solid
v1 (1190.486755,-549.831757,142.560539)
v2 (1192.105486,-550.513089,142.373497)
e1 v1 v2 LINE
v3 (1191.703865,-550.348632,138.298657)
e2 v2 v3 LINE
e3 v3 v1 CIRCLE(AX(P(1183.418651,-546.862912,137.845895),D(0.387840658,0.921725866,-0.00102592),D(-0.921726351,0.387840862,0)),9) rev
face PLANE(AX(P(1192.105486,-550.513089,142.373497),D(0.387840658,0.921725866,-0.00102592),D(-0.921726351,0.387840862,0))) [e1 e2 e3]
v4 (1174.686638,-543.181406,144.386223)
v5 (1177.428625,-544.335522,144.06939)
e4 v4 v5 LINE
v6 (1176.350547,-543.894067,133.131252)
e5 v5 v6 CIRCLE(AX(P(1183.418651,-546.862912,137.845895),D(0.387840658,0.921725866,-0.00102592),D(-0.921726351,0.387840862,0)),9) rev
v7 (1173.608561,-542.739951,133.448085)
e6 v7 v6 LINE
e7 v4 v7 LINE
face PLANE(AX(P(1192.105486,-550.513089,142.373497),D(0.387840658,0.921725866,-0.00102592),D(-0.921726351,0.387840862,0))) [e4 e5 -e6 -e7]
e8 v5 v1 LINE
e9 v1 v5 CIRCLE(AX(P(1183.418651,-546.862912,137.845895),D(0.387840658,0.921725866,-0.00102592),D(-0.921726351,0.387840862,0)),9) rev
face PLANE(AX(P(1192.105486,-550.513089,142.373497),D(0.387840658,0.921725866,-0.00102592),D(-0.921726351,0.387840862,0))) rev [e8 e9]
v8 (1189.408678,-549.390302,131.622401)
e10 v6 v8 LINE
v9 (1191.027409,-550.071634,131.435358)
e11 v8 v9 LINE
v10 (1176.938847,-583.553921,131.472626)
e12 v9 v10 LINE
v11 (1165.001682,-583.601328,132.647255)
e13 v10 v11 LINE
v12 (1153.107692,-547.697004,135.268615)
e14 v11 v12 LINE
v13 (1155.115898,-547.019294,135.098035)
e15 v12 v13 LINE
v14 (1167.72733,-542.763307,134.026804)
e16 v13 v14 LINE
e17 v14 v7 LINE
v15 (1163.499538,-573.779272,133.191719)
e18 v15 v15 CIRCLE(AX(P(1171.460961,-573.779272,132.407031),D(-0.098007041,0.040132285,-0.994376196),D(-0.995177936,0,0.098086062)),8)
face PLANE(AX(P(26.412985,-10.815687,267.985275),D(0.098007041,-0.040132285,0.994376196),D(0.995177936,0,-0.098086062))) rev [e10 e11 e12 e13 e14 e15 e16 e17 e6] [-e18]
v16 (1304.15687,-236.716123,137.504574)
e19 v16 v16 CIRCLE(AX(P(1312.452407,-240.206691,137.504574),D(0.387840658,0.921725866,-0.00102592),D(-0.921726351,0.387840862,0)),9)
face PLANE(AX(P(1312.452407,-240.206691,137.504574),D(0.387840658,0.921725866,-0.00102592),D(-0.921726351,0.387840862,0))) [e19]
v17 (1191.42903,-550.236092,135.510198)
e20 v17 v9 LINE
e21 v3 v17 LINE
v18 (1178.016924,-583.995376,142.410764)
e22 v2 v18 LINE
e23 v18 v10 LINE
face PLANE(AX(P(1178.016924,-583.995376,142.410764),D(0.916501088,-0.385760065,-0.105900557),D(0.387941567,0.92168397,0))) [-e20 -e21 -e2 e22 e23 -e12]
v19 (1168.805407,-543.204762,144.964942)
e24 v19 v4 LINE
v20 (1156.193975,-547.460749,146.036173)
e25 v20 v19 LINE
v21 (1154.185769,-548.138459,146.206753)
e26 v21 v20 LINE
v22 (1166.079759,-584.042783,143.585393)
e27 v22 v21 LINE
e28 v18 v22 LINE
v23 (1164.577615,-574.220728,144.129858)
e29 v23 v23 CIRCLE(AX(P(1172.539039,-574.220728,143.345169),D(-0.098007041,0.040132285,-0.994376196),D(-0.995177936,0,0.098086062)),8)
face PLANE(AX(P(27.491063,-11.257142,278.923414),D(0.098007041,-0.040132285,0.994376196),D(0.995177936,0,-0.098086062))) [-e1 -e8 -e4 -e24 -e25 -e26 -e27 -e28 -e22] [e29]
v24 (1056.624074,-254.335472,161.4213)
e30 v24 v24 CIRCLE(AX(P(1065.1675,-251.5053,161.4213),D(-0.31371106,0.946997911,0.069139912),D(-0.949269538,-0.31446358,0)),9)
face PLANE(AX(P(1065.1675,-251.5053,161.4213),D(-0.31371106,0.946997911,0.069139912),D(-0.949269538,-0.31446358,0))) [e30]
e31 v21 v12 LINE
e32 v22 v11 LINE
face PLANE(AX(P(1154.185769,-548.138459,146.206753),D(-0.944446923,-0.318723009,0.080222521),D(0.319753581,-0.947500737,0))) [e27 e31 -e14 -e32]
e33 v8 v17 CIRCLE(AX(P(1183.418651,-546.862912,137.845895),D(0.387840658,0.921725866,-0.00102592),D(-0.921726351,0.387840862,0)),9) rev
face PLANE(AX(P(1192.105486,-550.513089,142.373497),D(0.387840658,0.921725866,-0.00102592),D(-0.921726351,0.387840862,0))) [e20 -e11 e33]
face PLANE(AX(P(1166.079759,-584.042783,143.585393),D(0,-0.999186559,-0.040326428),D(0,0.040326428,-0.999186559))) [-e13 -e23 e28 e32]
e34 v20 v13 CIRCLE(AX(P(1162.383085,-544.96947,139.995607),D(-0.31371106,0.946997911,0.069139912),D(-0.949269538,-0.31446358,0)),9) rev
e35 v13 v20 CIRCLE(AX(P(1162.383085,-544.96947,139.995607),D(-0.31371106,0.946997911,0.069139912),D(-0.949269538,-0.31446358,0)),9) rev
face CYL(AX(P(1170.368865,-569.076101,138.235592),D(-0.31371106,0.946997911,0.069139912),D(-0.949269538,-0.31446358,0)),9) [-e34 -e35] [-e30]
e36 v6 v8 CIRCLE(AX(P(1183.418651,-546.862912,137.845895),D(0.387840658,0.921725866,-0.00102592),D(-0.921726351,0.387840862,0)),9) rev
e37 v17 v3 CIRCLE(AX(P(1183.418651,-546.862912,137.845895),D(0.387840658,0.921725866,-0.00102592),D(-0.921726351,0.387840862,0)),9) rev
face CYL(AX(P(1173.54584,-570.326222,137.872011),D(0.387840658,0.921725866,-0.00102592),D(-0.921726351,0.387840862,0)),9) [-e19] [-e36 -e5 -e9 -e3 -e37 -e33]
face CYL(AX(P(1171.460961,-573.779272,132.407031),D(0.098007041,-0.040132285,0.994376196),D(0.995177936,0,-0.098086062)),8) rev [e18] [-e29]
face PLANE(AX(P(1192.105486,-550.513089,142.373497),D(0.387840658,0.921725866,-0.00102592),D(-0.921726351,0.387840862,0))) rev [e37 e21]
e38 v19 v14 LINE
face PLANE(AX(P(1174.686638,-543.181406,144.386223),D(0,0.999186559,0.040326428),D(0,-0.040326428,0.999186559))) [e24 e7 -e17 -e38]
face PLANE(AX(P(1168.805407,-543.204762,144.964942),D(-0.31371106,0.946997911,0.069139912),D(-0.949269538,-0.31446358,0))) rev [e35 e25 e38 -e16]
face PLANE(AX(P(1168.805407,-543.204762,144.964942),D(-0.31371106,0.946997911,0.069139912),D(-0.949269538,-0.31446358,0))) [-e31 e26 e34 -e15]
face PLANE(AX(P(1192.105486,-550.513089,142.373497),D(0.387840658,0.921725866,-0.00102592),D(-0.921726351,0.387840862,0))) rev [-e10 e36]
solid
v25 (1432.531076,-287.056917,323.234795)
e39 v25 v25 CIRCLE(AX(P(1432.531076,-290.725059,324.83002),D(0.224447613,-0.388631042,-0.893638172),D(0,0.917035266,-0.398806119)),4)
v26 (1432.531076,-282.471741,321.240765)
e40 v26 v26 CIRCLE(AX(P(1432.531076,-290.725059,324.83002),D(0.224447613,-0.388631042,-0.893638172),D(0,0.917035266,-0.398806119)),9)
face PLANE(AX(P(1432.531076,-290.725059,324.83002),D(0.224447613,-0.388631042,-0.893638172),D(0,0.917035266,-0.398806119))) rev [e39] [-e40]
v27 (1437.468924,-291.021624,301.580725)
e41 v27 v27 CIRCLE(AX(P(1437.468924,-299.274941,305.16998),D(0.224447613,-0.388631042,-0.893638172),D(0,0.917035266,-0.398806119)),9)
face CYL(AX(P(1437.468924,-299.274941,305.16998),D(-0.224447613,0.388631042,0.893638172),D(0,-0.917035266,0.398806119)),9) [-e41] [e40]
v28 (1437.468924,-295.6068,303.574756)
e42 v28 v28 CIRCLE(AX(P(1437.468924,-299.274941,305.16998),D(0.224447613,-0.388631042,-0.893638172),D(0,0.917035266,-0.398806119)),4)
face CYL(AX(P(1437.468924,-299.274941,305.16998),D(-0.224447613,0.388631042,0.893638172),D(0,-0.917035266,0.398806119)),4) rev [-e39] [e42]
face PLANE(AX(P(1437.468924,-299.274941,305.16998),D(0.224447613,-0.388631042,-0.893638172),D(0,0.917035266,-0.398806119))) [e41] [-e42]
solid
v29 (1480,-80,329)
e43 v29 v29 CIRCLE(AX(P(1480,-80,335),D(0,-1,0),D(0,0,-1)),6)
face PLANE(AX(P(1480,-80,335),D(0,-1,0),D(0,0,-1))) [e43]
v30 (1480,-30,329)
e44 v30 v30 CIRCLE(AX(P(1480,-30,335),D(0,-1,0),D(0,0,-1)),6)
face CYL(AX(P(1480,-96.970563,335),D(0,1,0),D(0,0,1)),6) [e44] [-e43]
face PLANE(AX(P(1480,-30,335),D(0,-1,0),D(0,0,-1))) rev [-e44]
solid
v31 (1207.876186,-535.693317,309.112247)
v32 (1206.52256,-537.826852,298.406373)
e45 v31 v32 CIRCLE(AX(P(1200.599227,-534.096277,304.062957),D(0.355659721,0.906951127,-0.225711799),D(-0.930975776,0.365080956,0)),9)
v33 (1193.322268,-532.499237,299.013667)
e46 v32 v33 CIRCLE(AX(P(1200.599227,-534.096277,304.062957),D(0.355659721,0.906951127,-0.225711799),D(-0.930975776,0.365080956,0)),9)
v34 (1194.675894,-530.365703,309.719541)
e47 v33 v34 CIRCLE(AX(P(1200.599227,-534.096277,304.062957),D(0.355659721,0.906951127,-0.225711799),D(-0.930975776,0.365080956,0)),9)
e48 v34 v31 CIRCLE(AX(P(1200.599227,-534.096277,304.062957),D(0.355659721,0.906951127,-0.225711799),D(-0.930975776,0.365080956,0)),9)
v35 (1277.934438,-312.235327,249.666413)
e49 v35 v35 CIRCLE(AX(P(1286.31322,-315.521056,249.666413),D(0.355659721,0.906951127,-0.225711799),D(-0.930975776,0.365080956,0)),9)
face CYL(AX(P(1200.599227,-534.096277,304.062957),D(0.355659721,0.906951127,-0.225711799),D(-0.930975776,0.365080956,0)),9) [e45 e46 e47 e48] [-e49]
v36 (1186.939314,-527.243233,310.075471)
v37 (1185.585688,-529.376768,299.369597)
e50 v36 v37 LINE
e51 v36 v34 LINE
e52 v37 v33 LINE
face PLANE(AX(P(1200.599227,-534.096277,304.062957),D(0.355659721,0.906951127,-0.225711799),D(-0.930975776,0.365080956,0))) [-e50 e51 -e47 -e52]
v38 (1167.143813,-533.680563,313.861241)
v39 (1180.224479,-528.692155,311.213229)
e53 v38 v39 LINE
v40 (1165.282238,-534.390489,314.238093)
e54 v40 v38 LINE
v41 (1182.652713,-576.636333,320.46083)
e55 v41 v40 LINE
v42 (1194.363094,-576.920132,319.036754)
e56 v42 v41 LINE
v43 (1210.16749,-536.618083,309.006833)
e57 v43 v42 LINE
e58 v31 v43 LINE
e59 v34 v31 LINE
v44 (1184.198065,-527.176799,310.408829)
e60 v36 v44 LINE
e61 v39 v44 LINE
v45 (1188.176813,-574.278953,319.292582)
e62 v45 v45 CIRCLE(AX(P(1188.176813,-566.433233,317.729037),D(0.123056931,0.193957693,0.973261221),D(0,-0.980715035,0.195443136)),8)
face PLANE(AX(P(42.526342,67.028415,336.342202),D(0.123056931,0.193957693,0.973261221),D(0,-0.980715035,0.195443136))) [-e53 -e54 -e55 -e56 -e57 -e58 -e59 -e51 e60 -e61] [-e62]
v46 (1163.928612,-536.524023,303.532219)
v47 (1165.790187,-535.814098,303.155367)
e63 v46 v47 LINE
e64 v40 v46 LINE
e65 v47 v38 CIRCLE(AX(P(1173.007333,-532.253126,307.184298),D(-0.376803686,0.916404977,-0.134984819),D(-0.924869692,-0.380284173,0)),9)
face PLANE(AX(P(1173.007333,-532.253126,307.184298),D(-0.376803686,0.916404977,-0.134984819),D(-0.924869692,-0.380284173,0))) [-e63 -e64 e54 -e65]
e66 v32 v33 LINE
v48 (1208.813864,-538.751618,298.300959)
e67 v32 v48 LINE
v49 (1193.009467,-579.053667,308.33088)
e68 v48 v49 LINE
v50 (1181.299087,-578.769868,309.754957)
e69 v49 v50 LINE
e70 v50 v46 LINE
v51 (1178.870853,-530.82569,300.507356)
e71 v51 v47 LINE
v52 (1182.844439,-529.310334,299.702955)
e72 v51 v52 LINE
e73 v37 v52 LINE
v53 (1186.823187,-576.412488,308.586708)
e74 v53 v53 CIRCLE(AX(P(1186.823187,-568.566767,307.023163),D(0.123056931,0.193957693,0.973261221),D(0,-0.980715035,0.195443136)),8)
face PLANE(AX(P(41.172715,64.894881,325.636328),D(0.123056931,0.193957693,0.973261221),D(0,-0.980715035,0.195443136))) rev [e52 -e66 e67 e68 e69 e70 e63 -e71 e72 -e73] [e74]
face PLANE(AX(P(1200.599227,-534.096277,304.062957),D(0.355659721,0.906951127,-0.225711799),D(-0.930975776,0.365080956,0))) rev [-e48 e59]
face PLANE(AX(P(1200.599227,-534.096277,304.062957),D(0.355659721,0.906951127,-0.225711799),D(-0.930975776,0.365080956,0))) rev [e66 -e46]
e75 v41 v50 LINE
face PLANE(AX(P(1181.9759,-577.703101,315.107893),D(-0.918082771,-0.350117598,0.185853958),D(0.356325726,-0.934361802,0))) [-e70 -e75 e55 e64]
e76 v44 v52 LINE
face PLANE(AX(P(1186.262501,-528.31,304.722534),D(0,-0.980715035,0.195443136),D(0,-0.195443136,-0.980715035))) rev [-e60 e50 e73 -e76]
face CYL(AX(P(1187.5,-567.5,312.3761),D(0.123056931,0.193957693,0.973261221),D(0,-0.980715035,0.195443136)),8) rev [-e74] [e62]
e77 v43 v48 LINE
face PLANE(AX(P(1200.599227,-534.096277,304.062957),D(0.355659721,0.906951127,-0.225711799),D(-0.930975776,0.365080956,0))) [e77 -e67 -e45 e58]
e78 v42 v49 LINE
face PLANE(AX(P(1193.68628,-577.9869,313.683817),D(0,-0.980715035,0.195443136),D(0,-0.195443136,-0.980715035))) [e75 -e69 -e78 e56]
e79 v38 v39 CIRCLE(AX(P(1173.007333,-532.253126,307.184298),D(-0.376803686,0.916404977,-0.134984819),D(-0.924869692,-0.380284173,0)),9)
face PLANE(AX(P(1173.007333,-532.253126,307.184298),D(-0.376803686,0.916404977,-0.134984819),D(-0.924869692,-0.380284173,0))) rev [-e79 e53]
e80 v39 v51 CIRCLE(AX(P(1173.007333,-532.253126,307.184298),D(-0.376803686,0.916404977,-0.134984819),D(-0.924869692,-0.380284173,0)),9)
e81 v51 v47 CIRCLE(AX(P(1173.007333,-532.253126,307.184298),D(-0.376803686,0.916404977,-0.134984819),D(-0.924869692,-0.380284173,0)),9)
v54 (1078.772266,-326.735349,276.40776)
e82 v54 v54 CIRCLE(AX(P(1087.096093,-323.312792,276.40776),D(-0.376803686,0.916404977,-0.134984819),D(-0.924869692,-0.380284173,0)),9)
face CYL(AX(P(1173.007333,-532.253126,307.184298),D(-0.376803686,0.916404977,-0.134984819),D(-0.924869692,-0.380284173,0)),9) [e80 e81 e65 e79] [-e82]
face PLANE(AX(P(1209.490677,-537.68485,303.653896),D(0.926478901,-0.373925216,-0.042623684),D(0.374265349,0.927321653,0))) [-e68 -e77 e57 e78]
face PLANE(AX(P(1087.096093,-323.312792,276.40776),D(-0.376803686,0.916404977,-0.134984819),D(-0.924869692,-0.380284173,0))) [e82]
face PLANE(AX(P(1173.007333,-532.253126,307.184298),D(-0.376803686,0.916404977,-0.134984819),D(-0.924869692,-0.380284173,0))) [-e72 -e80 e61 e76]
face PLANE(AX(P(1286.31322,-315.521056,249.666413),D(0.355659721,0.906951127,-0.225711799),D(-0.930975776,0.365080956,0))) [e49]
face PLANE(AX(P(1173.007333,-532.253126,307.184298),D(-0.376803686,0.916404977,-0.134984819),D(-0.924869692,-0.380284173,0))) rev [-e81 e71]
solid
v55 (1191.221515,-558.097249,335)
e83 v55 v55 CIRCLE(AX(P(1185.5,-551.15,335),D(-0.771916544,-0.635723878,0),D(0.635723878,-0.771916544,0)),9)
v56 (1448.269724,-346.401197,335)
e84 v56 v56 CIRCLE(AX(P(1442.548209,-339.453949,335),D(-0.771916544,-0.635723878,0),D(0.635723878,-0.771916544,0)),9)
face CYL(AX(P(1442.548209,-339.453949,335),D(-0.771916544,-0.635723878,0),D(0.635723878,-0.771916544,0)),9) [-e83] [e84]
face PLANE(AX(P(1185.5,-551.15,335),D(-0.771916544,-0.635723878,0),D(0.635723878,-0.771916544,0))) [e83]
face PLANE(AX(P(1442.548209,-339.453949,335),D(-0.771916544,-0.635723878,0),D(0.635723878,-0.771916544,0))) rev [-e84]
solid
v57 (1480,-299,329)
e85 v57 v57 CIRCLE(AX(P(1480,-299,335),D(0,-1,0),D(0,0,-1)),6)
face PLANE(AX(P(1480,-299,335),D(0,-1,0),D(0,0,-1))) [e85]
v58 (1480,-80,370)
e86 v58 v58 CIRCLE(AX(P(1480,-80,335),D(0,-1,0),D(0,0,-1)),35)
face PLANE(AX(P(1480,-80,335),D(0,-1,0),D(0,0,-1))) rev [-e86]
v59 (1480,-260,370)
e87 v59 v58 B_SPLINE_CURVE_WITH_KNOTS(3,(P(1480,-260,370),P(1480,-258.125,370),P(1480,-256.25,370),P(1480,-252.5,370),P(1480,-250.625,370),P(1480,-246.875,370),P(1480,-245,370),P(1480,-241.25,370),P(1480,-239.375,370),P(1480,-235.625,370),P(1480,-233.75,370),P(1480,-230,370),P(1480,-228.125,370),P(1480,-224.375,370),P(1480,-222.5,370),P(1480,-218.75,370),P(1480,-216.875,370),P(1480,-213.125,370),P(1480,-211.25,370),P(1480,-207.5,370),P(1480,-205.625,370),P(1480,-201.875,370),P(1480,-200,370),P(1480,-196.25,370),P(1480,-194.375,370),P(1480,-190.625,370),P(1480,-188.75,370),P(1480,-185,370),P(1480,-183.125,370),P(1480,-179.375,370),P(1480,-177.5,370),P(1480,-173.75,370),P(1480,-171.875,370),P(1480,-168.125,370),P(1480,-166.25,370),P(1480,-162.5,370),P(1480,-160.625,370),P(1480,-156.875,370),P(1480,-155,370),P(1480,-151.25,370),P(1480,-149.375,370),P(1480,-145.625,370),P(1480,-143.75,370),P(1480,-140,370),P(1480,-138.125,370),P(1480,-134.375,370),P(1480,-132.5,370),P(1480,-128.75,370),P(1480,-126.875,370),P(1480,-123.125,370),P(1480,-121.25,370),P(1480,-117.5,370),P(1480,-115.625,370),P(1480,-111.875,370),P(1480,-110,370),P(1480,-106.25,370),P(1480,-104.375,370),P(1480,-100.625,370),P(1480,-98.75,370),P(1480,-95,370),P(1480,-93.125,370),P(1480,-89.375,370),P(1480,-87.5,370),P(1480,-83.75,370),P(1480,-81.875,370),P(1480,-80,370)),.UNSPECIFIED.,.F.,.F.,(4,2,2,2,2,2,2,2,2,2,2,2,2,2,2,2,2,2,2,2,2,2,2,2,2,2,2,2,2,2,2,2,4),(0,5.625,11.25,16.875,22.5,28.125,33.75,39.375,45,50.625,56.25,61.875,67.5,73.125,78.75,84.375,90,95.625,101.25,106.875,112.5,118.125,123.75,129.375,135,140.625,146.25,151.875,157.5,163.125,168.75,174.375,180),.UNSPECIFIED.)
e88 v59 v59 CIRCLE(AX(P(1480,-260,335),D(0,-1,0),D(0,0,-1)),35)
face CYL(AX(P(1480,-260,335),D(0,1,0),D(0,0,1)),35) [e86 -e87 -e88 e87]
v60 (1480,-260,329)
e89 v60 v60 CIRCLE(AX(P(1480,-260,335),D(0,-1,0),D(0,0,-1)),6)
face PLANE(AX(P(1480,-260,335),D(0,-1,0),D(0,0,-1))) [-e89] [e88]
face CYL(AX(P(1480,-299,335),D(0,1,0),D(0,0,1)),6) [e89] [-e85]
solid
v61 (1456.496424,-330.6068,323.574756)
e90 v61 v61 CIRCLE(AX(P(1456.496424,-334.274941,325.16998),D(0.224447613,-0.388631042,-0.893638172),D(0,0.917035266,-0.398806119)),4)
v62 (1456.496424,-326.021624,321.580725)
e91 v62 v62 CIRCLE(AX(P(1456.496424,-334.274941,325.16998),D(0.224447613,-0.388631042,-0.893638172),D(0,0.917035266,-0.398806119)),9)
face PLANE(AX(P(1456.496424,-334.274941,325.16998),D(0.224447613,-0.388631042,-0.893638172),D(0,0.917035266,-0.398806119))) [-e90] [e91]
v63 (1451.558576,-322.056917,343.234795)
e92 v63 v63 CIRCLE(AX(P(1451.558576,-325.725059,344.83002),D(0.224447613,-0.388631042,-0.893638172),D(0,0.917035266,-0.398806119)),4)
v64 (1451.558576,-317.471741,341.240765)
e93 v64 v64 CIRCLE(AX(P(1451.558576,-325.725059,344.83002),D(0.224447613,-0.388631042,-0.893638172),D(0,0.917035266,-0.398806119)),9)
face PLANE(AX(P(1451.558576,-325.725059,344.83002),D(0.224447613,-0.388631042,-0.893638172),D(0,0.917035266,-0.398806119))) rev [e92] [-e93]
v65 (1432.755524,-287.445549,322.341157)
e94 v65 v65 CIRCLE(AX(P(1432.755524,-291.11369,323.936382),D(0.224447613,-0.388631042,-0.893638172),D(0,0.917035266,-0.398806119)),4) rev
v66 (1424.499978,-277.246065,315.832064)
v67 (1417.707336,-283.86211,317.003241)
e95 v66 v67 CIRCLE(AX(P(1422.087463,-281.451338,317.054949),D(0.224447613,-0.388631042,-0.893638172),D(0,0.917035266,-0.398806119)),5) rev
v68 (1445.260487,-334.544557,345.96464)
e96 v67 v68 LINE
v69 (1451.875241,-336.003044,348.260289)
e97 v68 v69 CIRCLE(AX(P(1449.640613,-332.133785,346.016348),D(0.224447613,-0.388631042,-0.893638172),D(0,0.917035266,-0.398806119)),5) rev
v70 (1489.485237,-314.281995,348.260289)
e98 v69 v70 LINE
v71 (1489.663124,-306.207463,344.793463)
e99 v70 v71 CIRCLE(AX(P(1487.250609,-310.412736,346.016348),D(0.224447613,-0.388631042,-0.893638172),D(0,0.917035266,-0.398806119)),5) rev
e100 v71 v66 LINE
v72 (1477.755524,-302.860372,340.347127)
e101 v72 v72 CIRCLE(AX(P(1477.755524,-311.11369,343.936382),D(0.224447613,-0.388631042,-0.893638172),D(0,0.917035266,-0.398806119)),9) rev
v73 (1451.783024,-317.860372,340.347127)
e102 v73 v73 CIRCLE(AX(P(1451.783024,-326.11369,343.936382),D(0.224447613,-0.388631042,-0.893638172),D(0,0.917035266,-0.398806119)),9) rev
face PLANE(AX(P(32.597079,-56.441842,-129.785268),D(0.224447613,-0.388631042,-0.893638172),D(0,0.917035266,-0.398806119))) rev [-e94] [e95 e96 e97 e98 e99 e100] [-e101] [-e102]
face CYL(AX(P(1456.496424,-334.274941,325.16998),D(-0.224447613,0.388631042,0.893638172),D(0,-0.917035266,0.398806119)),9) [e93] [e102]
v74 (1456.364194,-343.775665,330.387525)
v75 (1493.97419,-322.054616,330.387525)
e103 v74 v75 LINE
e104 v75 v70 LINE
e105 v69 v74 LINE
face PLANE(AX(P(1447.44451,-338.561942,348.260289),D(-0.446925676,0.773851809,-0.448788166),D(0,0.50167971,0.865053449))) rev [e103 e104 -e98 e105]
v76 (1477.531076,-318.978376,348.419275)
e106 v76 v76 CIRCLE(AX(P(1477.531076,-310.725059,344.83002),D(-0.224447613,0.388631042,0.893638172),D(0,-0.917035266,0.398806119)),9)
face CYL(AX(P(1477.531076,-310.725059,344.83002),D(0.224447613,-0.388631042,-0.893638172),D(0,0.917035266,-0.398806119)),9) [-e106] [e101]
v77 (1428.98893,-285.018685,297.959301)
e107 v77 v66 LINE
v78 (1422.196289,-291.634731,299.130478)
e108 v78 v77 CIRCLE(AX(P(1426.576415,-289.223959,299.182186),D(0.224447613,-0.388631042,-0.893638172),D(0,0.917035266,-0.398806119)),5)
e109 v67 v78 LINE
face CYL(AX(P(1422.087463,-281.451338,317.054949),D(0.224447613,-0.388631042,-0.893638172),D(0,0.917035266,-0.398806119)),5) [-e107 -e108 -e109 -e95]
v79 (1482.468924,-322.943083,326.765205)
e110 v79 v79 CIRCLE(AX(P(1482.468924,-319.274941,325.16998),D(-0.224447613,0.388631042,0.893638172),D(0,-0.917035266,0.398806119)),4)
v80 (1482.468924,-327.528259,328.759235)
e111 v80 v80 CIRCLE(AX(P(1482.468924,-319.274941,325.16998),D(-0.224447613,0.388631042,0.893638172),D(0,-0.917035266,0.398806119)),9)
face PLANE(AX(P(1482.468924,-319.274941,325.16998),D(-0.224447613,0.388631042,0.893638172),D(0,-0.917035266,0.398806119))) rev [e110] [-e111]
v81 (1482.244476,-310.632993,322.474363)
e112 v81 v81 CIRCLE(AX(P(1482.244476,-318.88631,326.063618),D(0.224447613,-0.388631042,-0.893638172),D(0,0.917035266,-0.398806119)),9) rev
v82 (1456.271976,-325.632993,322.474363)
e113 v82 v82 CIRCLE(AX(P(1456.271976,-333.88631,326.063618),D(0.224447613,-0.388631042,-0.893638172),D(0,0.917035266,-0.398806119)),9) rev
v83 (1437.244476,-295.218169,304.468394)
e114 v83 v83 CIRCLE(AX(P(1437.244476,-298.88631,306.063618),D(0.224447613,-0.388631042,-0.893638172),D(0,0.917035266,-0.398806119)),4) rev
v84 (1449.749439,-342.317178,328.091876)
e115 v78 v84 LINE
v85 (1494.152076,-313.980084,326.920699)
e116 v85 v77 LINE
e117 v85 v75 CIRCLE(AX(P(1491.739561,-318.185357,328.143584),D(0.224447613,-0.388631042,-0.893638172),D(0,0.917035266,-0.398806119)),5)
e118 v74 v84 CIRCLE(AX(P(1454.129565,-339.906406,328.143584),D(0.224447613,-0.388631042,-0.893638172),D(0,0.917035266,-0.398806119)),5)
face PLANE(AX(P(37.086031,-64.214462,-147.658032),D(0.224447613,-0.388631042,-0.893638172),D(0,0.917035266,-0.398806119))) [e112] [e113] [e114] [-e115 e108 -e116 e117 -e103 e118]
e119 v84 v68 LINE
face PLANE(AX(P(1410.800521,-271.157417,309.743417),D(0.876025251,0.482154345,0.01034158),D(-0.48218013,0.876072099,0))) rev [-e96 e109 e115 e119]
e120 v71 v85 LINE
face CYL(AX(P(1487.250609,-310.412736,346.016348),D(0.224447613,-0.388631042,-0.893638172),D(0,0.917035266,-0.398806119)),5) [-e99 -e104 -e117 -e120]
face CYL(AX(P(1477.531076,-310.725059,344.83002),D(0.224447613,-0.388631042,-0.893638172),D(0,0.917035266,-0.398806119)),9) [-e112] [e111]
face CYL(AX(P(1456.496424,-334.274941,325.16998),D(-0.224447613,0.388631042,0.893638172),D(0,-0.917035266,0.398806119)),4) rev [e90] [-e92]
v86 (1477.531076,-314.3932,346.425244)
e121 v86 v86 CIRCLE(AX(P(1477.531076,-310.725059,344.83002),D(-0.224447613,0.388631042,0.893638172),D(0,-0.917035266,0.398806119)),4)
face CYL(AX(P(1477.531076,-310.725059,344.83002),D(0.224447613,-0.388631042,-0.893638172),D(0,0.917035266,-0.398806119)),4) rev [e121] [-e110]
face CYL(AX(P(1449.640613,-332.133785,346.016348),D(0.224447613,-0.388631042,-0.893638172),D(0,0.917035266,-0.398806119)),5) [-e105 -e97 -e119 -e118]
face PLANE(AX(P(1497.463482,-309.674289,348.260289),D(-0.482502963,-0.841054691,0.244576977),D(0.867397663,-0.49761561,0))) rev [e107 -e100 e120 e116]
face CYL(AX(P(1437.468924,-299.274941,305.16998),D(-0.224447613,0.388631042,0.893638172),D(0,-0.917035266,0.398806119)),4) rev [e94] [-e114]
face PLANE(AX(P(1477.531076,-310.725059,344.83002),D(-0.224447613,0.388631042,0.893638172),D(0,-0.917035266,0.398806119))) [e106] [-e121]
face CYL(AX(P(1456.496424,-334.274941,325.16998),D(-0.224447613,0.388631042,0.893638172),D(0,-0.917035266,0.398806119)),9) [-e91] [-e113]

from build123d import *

# Parameters (mm, degrees)
BOSS_EXTRUDE3_DEPTH       = 5.5
BOSS_EXTRUDE3_DEPTH_BACK  = 5.5
CUT_EXTRUDE1_START        = 334.582659855
CUT_EXTRUDE1_OUTLINE_R    = 8
CUT_EXTRUDE1_DEPTH        = 11
BOSS_EXTRUDE4_START       = -126.025031836
BOSS_EXTRUDE4_OUTLINE_R   = 9
BOSS_EXTRUDE4_DEPTH       = 241
BOSS_EXTRUDE5_START       = 743.218117344
BOSS_EXTRUDE5_OUTLINE_R   = 9
BOSS_EXTRUDE5_DEPTH       = 228
BOSS_EXTRUDE6_DEPTH       = 5.5
CUT_EXTRUDE2_DEPTH        = 5.5
CUT_EXTRUDE2_DEPTH_BACK   = 5.5
SKETCH7_R                 = 8
SKETCH8_R                 = 9
BOSS_EXTRUDE7_DEPTH       = 332.697857842
SKETCH9_R                 = 9
BOSS_EXTRUDE8_DEPTH       = 309.888930441
BOSS_EXTRUDE10_DEPTH      = 10
SKETCH13_R                = 35
BOSS_EXTRUDE12_DEPTH      = 180
FILLET1_R                 = 5
FILLET2_R                 = 5
FILLET3_R                 = 5
BOSS_EXTRUDE14_DEPTH      = 1
BOSS_EXTRUDE14_DEPTH_BACK = 21
SKETCH15_R                = 9
SKETCH15_R_2              = 4
SKETCH16_R                = 4
CUT_EXTRUDE5_DEPTH        = 21
BOSS_EXTRUDE17_DEPTH      = 1
BOSS_EXTRUDE17_DEPTH_BACK = 21
SKETCH18_R                = 9
SKETCH18_R_2              = 4
CUT_EXTRUDE6_DEPTH        = 1
CUT_EXTRUDE6_DEPTH_BACK   = 21
SKETCH20_R                = 4
SKETCH21_R                = 9
SKETCH21_R_2              = 4
BOSS_EXTRUDE19_DEPTH      = 11
SKETCH22_R                = 4
CUT_EXTRUDE7_DEPTH        = 22
SKETCH23_R                = 6
BOSS_EXTRUDE21_DEPTH      = 50
SKETCH10_R                = 9
BOSS_EXTRUDE22_DEPTH      = 333
SKETCH24_R                = 6
BOSS_EXTRUDE23_DEPTH      = 39


# Read off the part's stored shape, not the designer's step: Cut-Extrude1, Boss-Extrude4, Boss-Extrude5
with BuildPart() as part:
    # 3DSketch4 → Boss-Extrude3 (new, two sides: drawn at the far end of the back side and taken through both)
    with BuildSketch(Plane(origin=(1200.599227071, -534.096277105, 304.062957014), x_dir=(-0.382515316114057, -0.8956658518967009, 0.22685835819806208), z_dir=(-0.12305693112364045, -0.19395769250788458, -0.973261221471116)).offset(-BOSS_EXTRUDE3_DEPTH_BACK)):
        Polygon((0, 0), (-0.279752242, -9.592956607), (44.138212359, -10.888284593), (48.686486711, 0), (16.081118939, 32.58922022), (9.611577246, 26.11647295), (1.515769737, 18.016654069), (0.451077286, 15.467846872), align=None)
    extrude(amount=BOSS_EXTRUDE3_DEPTH + BOSS_EXTRUDE3_DEPTH_BACK)

    # Cut-Extrude1 outline → Cut-Extrude1 (cut)
    with BuildSketch(Plane(origin=(0, 0, 0), x_dir=(0.992399612909251, -0.02405063252480931, -0.12068378255890523), z_dir=(0.12305693112364104, 0.19395769250788705, 0.9732612214711154)).offset(CUT_EXTRUDE1_START)):
        with Locations((1154.424544959, -617.607547164)):
            Circle(CUT_EXTRUDE1_OUTLINE_R)
    extrude(amount=CUT_EXTRUDE1_DEPTH, mode=Mode.SUBTRACT)

    # Boss-Extrude4 outline → Boss-Extrude4 (add)
    with BuildSketch(Plane(origin=(0, 0, 0), x_dir=(0.9346155161819424, -0.3451322804950485, 0.08589264154890401), z_dir=(0.3556597206768871, 0.9069511269705414, -0.22571179937013408)).offset(BOSS_EXTRUDE4_START)):
        with Locations((1332.549303033, -166.077287509)):
            Circle(BOSS_EXTRUDE4_OUTLINE_R)
    extrude(amount=BOSS_EXTRUDE4_DEPTH)

    # Boss-Extrude5 outline → Boss-Extrude5 (add)
    with BuildSketch(Plane(origin=(0, 0, 0), x_dir=(0.9262931406329792, 0.3727813126307993, -0.05491002248724934), z_dir=(0.376803685778539, -0.916404976593078, 0.134984818624719)).offset(BOSS_EXTRUDE5_START)):
        with Locations((871.267130908, 226.342092845)):
            Circle(BOSS_EXTRUDE5_OUTLINE_R)
    extrude(amount=BOSS_EXTRUDE5_DEPTH)


with BuildPart() as body_2:
    # Sketch6 → Boss-Extrude6 (new, symmetric)
    with BuildSketch(Plane(origin=(26.952024064, -11.036414307, 273.454344487), x_dir=(-0.9951857213114613, -0.003952273848494241, 0.09792731809466178), z_dir=(-0.09800704106229594, 0.040132284967506364, -0.9943761962182625))):
        Polygon((-1146.835530247, -536.916979065), (-1132.145169023, -541.796584985), (-1144.096696824, -577.777412829), (-1156.091608569, -577.777412829), (-1170.248325105, -544.323864719), (-1152.745212363, -536.916979065), align=None)
    extrude(amount=BOSS_EXTRUDE6_DEPTH, both=True)

    # Sketch7 → Cut-Extrude2 (cut, two sides: drawn at the far end of the back side and taken through both)
    with BuildSketch(Plane(origin=(26.952024064, -11.036414307, 273.454344487), x_dir=(-0.9951857213114613, -0.003952273848494241, 0.09792731809466178), z_dir=(-0.09800704106229594, 0.040132284967506364, -0.9943761962182625)).offset(-CUT_EXTRUDE2_DEPTH_BACK)):
        with Locations(Location((-1150.587223486, -567.973034168, 0), (0, 0, 0.226631782))):
            Circle(SKETCH7_R)
    extrude(amount=CUT_EXTRUDE2_DEPTH + CUT_EXTRUDE2_DEPTH_BACK, mode=Mode.SUBTRACT)

    # Sketch8 → Boss-Extrude7 (add)
    with BuildSketch(Plane(origin=(111.495119962, 264.97463301, -0.294927936), x_dir=(0.9217264367108834, -0.3878404175924364, 0.00043168273353130435), z_dir=(0.3878406578329016, 0.9217258657651006, -0.001025919742377429))):
        with Locations(Location((1302.943302255, -137.237128795, 0), (0, 0, 180.024733613))):
            Circle(SKETCH8_R)
    extrude(amount=-BOSS_EXTRUDE7_DEPTH)

    # Sketch9 → Boss-Extrude8 (add)
    with BuildSketch(Plane(origin=(176.044973847, -531.426026978, -38.799186748), x_dir=(0.949518494071323, 0.3128782858475271, 0.02284310971912741), z_dir=(-0.31371106039877994, 0.9469979108416423, 0.0691399120988602))):
        with Locations(Location((936.393057855, -179.306342386, 0), (0, 0, 181.312067991))):
            Circle(SKETCH9_R)
    extrude(amount=-BOSS_EXTRUDE8_DEPTH)


with BuildPart() as body_3:
    # Sketch11 → Boss-Extrude10 (new, symmetric)
    with BuildSketch(Plane(origin=(34.841554728, -60.328152011, -138.721650148), x_dir=(0.9744861563673539, 0.08951108154828352, 0.20582637665867218), z_dir=(-0.2244476131492181, 0.3886310421678697, 0.8936381717536099))):
        Polygon((1451.890744425, -449.361574785), (1503.219305304, -422.870577787), (1414.287348828, -372.188484488), align=None)
    extrude(amount=BOSS_EXTRUDE10_DEPTH, both=True)

    # Fillet1
    fillet1_edges = [body_3.edges().sort_by_distance(p)[0] for p in [
        (1413.044997286, -275.043727724, 300.807035499),
    ]]
    fillet(fillet1_edges, radius=FILLET1_R)

    # Fillet2
    fillet2_edges = [body_3.edges().sort_by_distance(p)[0] for p in [
        (1499.70795773, -313.560599032, 339.323906808),
    ]]
    fillet(fillet2_edges, radius=FILLET2_R)

    # Fillet3
    fillet3_edges = [body_3.edges().sort_by_distance(p)[0] for p in [
        (1449.688985727, -342.448252514, 339.323906808),
    ]]
    fillet(fillet3_edges, radius=FILLET3_R)

    # Sketch15 → Boss-Extrude14 (add, two sides: drawn at the far end of the back side and taken through both)
    with BuildSketch(Plane(origin=(37.086030859, -64.214462433, -147.658031866), x_dir=(-0.9744861563673538, -0.08951108154828336, -0.2058263766586726), z_dir=(0.22444761314921843, -0.3886310421678689, -0.8936381717536103)).offset(-BOSS_EXTRUDE14_DEPTH_BACK)):
        with Locations(Location((-1456.342848997, -436.221687735, 0), (0, 0, 90))):
            Circle(SKETCH15_R)
        with Locations(Location((-1456.342848997, -436.221687735, 0), (0, 0, 90))):
            Circle(SKETCH15_R_2, mode=Mode.SUBTRACT)
    extrude(amount=BOSS_EXTRUDE14_DEPTH + BOSS_EXTRUDE14_DEPTH_BACK)

    # Sketch16 → Cut-Extrude5 (cut)
    with BuildSketch(Plane(origin=(37.086030859, -64.214462433, -147.658031866), x_dir=(-0.9744861563673537, -0.0895110815482837, -0.2058263766586731), z_dir=(0.224447613149219, -0.38863104216786926, -0.8936381717536099))):
        with Locations(Location((-1456.342848997, -436.221687735, 0), (0, 0, 90))):
            Circle(SKETCH16_R)
    extrude(amount=-CUT_EXTRUDE5_DEPTH, mode=Mode.SUBTRACT)

    # Sketch20 → Cut-Extrude6 (cut, two sides: drawn at the far end of the back side and taken through both)
    with BuildSketch(Plane(origin=(37.086030859, -64.214462433, -147.658031866), x_dir=(-0.9744861563673538, -0.08951108154828336, -0.2058263766586726), z_dir=(0.22444761314921843, -0.3886310421678689, -0.8936381717536103)).offset(-CUT_EXTRUDE6_DEPTH_BACK)):
        with Locations(Location((-1436.817173978, -396.149331037, 0), (0, 0, 90))):
            Circle(SKETCH20_R)
    extrude(amount=CUT_EXTRUDE6_DEPTH + CUT_EXTRUDE6_DEPTH_BACK, mode=Mode.SUBTRACT)

    # Sketch21 → Boss-Extrude19 (add, symmetric)
    with BuildSketch(Plane(origin=(34.841554728, -60.328152011, -138.721650148), x_dir=(0.9744861563673539, 0.08951108154828352, 0.20582637665867218), z_dir=(-0.2244476131492181, 0.3886310421678697, 0.8936381717536099))):
        with Locations(Location((1482.995356917, -422.466158743, 0), (0, 0, 90))):
            Circle(SKETCH21_R)
        with Locations(Location((1482.995356917, -422.466158743, 0), (0, 0, 90))):
            Circle(SKETCH21_R_2, mode=Mode.SUBTRACT)
    extrude(amount=BOSS_EXTRUDE19_DEPTH, both=True)

    # Sketch22 → Cut-Extrude7 (cut)
    with BuildSketch(Plane(origin=(32.597078596, -56.441841589, -129.785268431), x_dir=(0.9744861563673537, 0.0895110815482837, 0.2058263766586731), z_dir=(-0.224447613149219, 0.38863104216786926, 0.8936381717536099))):
        with Locations(Location((1482.995356917, -422.466158743, 0), (0, 0, 270))):
            Circle(SKETCH22_R)
    extrude(amount=-CUT_EXTRUDE7_DEPTH, mode=Mode.SUBTRACT)


with BuildPart() as body_4:
    # Sketch13 → Boss-Extrude12 (new body)
    with BuildSketch(Plane(origin=(1480, -80, 335), x_dir=(-1, 0, 0), z_dir=(0, -1, 0))):
        with Locations(Location((0, 0, 0), (0, 0, 270))):
            Circle(SKETCH13_R)
    extrude(amount=BOSS_EXTRUDE12_DEPTH)

    # Sketch24 → Boss-Extrude23 (add)
    with BuildSketch(Plane(origin=(0, -260, 0), x_dir=(-1, 0, 0), z_dir=(0, -1, 0))):
        with Locations(Location((-1480, -335, 0), (0, 0, 90))):
            Circle(SKETCH24_R)
    extrude(amount=BOSS_EXTRUDE23_DEPTH)


with BuildPart() as body_5:
    # Sketch18 → Boss-Extrude17 (new, two sides: drawn at the far end of the back side and taken through both)
    with BuildSketch(Plane(origin=(37.086030859, -64.214462433, -147.658031866), x_dir=(-0.9744861563673537, -0.0895110815482837, -0.2058263766586731), z_dir=(0.224447613149219, -0.38863104216786926, -0.8936381717536099)).offset(-BOSS_EXTRUDE17_DEPTH_BACK)):
        with Locations(Location((-1436.817173978, -396.149331037, 0), (0, 0, 90))):
            Circle(SKETCH18_R)
        with Locations(Location((-1436.817173978, -396.149331037, 0), (0, 0, 90))):
            Circle(SKETCH18_R_2, mode=Mode.SUBTRACT)
    extrude(amount=BOSS_EXTRUDE17_DEPTH + BOSS_EXTRUDE17_DEPTH_BACK)


with BuildPart() as body_6:
    # Sketch23 → Boss-Extrude21 (new body)
    with BuildSketch(Plane(origin=(1480, -30, 335), x_dir=(-1, 0, 0), z_dir=(0, -1, 0))):
        with Locations(Location((0, 0, 0), (0, 0, 90))):
            Circle(SKETCH23_R)
    extrude(amount=BOSS_EXTRUDE21_DEPTH)


with BuildPart() as body_7:
    # Sketch10 → Boss-Extrude22 (new body)
    with BuildSketch(Plane(origin=(1185.5, -551.15, 335), x_dir=(0, 0, 1), z_dir=(-0.7719165439130806, -0.6357238781367938, 0))):
        with Locations(Location((0, 0, 0), (0, 0, 270))):
            Circle(SKETCH10_R)
    extrude(amount=-BOSS_EXTRUDE22_DEPTH)


solid = Compound([part.part, body_2.part, body_3.part, body_4.part, body_5.part, body_6.part, body_7.part])
